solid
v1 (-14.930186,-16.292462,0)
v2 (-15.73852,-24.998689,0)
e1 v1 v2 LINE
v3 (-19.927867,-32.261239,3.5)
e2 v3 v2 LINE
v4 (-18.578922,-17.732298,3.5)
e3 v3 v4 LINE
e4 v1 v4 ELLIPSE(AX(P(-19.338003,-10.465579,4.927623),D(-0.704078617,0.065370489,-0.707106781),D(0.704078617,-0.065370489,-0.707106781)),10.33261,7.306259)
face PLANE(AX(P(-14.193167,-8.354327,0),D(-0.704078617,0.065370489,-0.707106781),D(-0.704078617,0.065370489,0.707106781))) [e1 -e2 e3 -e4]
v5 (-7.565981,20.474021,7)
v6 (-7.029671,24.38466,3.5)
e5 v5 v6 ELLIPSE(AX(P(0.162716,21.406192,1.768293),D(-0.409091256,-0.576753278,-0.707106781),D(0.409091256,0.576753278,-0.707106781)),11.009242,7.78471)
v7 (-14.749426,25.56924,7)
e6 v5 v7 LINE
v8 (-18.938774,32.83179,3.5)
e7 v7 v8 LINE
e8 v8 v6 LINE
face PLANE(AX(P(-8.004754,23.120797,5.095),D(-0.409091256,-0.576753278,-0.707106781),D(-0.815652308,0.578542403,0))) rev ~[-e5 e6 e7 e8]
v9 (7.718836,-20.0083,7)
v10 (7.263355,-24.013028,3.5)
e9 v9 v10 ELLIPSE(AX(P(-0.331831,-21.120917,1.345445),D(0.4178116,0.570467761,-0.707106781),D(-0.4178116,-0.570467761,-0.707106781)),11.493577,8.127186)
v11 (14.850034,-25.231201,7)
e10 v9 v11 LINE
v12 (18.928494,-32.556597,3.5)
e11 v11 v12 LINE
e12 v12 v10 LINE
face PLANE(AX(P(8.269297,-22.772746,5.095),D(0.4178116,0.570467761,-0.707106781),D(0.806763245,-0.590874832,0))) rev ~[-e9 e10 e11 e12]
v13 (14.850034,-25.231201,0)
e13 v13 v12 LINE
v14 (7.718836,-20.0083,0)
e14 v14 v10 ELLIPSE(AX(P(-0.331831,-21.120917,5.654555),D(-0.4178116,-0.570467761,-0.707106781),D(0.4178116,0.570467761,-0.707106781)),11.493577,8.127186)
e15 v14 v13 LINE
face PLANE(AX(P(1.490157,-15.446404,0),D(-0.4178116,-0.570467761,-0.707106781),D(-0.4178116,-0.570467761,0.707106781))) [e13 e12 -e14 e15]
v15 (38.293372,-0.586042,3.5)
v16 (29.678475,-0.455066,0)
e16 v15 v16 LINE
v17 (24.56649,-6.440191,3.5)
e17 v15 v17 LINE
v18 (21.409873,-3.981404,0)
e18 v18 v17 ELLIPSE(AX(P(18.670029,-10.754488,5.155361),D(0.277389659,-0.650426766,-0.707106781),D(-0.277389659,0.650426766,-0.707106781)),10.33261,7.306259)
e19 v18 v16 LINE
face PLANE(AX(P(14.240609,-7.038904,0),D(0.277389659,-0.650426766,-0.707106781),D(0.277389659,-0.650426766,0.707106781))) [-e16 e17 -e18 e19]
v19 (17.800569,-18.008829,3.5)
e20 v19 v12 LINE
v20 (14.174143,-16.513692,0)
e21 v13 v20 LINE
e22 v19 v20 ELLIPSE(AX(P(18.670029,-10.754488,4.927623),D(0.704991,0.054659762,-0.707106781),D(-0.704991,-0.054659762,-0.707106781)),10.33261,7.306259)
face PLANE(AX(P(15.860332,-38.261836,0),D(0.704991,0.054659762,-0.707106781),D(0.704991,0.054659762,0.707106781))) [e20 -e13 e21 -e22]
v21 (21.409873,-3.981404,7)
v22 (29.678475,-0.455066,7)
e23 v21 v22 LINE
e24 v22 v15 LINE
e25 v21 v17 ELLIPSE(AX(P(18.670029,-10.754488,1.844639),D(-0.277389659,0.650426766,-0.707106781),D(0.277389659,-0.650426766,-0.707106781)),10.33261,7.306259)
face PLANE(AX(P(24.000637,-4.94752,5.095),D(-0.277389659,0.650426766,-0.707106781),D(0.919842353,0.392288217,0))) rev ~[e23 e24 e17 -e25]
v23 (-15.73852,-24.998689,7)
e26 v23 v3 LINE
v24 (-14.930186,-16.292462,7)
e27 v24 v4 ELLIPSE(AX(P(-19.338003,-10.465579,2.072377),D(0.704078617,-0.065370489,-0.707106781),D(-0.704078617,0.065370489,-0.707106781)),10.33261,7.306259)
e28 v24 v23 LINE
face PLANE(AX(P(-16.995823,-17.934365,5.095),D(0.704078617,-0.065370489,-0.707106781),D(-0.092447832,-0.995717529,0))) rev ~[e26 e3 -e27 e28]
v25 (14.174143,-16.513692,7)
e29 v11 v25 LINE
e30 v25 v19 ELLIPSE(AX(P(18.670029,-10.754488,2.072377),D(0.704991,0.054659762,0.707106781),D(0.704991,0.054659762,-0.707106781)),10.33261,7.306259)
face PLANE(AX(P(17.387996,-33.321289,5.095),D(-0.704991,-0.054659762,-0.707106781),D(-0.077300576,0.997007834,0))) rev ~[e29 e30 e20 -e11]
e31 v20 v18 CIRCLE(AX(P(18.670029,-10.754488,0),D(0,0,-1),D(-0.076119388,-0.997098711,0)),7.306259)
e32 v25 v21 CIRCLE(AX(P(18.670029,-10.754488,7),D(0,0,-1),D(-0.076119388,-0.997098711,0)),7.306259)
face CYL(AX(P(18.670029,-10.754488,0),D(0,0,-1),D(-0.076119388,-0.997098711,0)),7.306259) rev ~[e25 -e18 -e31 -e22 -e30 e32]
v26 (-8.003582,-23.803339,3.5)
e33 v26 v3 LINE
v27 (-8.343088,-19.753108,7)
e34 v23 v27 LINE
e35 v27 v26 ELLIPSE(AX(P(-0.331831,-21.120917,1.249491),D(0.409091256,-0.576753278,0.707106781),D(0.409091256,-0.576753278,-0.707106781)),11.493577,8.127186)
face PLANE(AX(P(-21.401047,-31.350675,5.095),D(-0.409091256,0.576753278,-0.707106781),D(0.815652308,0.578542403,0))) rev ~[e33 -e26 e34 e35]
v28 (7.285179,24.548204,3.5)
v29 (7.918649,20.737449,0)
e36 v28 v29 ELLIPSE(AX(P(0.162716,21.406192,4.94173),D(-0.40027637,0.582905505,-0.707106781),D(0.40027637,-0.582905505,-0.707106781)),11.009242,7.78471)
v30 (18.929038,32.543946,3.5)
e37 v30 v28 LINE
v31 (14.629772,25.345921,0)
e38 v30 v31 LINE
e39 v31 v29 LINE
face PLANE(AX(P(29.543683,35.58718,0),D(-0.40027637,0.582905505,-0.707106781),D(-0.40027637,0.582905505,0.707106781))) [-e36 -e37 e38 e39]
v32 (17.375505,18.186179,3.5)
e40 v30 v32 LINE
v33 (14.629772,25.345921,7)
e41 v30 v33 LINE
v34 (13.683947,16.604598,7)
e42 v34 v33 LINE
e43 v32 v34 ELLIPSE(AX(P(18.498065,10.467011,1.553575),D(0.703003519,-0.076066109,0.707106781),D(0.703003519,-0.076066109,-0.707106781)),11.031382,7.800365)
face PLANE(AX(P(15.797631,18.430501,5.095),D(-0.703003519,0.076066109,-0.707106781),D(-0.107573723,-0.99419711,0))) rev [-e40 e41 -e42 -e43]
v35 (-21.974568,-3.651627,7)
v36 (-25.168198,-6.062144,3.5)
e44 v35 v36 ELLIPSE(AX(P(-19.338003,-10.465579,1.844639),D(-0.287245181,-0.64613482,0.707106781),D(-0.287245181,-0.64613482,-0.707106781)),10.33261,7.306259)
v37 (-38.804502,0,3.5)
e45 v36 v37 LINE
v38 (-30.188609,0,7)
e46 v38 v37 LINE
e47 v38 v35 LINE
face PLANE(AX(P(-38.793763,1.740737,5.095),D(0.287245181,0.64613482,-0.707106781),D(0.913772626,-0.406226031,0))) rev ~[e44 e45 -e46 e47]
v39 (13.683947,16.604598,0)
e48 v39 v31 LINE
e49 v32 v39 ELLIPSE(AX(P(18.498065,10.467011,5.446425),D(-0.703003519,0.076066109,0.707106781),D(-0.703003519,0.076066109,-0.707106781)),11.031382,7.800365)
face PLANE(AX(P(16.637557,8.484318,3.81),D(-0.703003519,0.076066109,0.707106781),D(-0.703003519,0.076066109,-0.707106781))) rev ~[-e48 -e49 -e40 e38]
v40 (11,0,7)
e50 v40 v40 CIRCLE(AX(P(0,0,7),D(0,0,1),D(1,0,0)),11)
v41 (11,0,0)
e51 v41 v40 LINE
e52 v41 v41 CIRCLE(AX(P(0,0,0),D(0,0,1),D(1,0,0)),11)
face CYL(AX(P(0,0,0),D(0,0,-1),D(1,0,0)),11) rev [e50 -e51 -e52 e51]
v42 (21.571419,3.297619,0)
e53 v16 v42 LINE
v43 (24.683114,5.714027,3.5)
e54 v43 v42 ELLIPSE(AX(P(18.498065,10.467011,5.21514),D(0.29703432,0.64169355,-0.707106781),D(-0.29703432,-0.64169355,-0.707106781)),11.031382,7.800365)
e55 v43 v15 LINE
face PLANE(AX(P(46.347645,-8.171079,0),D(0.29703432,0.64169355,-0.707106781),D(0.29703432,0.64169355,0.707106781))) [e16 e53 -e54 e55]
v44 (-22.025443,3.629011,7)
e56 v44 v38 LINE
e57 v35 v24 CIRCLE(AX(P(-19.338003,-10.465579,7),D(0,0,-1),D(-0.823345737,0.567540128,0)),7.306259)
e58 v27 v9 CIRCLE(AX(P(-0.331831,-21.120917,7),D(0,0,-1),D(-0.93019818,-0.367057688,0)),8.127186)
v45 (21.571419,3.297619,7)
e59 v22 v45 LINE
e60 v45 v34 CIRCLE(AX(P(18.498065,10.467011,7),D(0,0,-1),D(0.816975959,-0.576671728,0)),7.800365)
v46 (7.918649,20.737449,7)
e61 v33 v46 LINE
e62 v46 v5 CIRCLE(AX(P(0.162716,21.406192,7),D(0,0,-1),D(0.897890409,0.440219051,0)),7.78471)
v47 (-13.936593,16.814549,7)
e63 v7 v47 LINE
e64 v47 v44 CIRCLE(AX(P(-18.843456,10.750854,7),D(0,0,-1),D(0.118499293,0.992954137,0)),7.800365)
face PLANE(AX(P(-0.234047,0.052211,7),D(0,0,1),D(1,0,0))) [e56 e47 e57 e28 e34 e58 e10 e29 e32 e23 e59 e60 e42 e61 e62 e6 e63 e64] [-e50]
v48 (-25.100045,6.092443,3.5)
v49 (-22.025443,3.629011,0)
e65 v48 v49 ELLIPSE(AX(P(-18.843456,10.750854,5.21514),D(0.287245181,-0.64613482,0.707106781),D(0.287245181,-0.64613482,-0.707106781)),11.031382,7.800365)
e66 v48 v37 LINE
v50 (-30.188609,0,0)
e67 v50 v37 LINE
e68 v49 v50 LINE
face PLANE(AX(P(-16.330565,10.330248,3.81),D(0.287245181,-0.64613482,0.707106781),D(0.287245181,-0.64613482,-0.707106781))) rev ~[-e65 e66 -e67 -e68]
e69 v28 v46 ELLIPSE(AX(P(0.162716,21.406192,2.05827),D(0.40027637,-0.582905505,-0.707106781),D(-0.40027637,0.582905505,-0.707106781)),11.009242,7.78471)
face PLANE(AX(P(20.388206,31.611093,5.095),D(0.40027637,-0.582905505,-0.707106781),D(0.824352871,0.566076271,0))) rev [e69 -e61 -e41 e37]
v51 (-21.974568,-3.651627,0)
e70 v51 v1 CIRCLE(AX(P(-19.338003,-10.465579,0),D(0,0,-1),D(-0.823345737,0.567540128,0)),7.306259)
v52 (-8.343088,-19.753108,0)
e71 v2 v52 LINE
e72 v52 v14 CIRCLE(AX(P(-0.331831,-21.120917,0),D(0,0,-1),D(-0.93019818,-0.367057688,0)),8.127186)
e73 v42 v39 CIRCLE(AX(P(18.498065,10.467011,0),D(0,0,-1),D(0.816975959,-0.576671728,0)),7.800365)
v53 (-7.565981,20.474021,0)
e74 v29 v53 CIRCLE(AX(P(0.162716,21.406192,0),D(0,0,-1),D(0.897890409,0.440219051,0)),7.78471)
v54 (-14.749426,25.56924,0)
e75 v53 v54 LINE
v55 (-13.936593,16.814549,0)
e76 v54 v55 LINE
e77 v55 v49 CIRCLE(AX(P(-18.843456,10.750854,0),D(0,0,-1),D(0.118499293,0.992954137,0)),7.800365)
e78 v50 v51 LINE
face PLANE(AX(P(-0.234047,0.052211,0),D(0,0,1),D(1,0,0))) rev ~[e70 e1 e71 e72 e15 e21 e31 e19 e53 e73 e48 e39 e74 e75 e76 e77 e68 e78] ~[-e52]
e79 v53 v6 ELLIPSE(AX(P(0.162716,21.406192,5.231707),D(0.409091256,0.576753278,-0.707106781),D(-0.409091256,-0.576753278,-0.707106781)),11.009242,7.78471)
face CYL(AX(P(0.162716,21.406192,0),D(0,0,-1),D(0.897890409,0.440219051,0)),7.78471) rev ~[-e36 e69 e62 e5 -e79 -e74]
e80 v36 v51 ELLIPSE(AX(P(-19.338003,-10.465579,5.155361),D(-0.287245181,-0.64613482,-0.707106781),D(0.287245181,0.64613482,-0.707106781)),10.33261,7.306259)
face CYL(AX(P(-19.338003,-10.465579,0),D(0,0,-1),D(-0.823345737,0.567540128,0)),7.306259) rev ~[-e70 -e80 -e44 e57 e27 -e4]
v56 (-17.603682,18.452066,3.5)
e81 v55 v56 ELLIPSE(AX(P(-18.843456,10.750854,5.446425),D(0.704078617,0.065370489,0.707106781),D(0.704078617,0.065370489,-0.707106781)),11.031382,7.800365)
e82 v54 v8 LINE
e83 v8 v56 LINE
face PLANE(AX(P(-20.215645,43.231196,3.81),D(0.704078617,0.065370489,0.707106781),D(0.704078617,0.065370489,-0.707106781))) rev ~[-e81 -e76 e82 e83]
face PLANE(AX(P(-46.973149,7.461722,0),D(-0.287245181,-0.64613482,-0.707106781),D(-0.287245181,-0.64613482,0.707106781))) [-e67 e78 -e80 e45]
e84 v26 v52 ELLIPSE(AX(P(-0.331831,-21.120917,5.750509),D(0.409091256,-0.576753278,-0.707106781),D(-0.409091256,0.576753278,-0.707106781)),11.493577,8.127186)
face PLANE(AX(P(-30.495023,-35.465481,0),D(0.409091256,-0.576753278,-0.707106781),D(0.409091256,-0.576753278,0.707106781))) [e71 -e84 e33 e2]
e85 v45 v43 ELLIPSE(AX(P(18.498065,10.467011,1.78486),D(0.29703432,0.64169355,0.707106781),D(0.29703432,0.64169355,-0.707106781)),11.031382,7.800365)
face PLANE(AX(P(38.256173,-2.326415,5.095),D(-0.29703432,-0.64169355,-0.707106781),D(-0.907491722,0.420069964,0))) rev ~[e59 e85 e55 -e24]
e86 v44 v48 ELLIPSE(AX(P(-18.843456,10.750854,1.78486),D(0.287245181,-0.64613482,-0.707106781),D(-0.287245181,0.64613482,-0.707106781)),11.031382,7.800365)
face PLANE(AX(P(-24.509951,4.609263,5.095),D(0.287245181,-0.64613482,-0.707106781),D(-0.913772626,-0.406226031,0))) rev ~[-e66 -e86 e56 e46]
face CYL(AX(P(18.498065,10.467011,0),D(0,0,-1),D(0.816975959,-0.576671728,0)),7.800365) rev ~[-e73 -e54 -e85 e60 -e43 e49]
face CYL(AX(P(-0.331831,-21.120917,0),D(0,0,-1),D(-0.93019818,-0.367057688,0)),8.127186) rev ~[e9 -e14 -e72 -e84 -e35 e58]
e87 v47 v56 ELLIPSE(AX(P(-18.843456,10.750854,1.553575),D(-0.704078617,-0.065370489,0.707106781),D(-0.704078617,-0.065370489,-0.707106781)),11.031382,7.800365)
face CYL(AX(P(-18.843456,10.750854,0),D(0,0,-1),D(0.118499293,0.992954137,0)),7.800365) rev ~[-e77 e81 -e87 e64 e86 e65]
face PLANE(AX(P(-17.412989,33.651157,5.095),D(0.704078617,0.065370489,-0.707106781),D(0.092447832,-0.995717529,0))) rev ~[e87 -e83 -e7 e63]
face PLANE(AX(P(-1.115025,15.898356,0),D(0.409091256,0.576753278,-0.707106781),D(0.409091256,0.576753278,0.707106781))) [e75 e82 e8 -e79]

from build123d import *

# Parameters (mm, degrees)
F0_R         = 11
F1_DEPTH     = 7
F2_SIZE      = 3.81
F3_T1_DEPTH  = 34.6394313852
F3_T3_DEPTH  = 34.3439110976
F4_SIZE      = 3.81
F5_T1_DEPTH  = 35.2279158768
F5_T3_DEPTH  = 35.1515641575
F5_T5_DEPTH  = 34.8076073963
F5_T7_DEPTH  = 34.8076073963
F5_T9_DEPTH  = 34.5979192148
F5_T11_DEPTH = 35.1515641575
F5_T13_DEPTH = 35.2279158768
F5_T15_DEPTH = 34.6394313852
F5_T17_DEPTH = 34.8076073963
F6_T1_DEPTH  = 29.7856896268


# Not quite as in the source:
# - a fillet or chamfer that OpenCascade refuses, or shapes differently, is made with other operations: its cross-section is extruded or revolved along the edge and cut away or added


with BuildPart() as f1:
    # F0 (on Top) → F1 (new body)
    with BuildSketch(Plane.XY):
        with BuildLine():
            Line((-19.3098304855, 33.4750442975), (-17.9191186068, 18.4962593726))
            ThreePointArc((-17.9191186068, 18.4962593726), (-12.1734101316, 6.7065768921), (-25.2838117957, 6.35))
            Line((-25.2838117957, 6.35), (-39.5676235915, 0))
            Line((-39.5676235915, 0), (-25.3535799067, -6.3189839441))
            ThreePointArc((-25.3535799067, -6.3189839441), (-12.9763127609, -6.8724869317), (-18.8926645602, -17.7582523592))
            Line((-18.8926645602, -17.7582523592), (-20.2989239466, -32.9044930863))
            Line((-20.2989239466, -32.9044930863), (-7.891724267, -24.1040629982))
            ThreePointArc((-7.891724267, -24.1040629982), (-0.2207247048, -12.9944902326), (7.1436805269, -24.3096295115))
            Line((7.1436805269, -24.3096295115), (19.2464965418, -33.1737534264))
            Line((19.2464965418, -33.1737534264), (19.2872961226, -33.1740312262))
            Line((19.2872961226, -33.1740312262), (18.113880894, -18.0395493303))
            ThreePointArc((18.113880894, -18.0395493303), (12.3636945983, -7.0651033251), (24.7479456966, -6.6998194754))
            Line((24.7479456966, -6.6998194754), (39.056406052, -0.5976429607))
            Line((39.056406052, -0.5976429607), (24.8707754105, 5.9687611329))
            ThreePointArc((24.8707754105, 5.9687611329), (11.7673092468, 6.524596873), (17.6915767021, 18.225572644))
            Line((17.6915767021, 18.225572644), (19.3098304855, 33.1814855899))
            Line((19.3098304855, 33.1814855899), (7.1525325905, 24.8331700857))
            ThreePointArc((7.1525325905, 24.8331700857), (0.2505296838, 13.6219778067), (-6.9026308059, 24.6746142094))
            Line((-6.9026308059, 24.6746142094), (-19.3098304855, 33.4750442975))
        make_face()
        Circle(F0_R, mode=Mode.SUBTRACT)
    extrude(amount=F1_DEPTH)

    # F2
    f2_edges = [f1.edges().sort_by_distance(p)[0] for p in [
        (18.500704, 25.703529, 7),
        (13.231182, 29.007328, 7),
    ]]
    chamfer(f2_edges, length=F2_SIZE)

    # F3: chamfer of 3.81 on 2 edges, made by hand

    # F3_s2 → F3_t1 (cut)
    with BuildSketch(Plane(origin=(1.0999249917, 10.1655145758, 0), x_dir=(0, 0, 1), z_dir=(0.1075737229, 0.9941971103, 0))):
        Polygon((3.81, 15.6283217323), (0, 11.8183217323), (0, 15.6283217323), align=None)
    extrude(amount=F3_T1_DEPTH, mode=Mode.SUBTRACT)

    # F3_s4 → F3_t3 (cut)
    with BuildSketch(Plane(origin=(36.6832724438, 25.190098551, 0), x_dir=(0, 0, 1), z_dir=(-0.8243528709, -0.5660762706, 0))):
        Polygon((0, 12.6124160802), (3.81, 16.4224160802), (0, 16.4224160802), align=None)
    extrude(amount=F3_T3_DEPTH, mode=Mode.SUBTRACT)

    # F4 (call 1 of 6: OpenCascade refuses the feature's edges together)
    f4_edges = [f1.edges().sort_by_distance(p)[0] for p in [
        (31.902176, -3.648731, 7),
        (31.963591, 2.685559, 7),
    ]]
    chamfer(f4_edges, length=F4_SIZE)

    # F4#2 (call 2 of 6)
    f4_2_edges = [f1.edges().sort_by_distance(p)[0] for p in [
        (18.700589, -25.60679, 7),
    ]]
    chamfer(f4_2_edges, length=F4_SIZE)

    # F4#3 (call 3 of 6)
    f4_3_edges = [f1.edges().sort_by_distance(p)[0] for p in [
        (13.195089, -28.741691, 7),
    ]]
    chamfer(f4_3_edges, length=F4_SIZE)

    # F4#4 (call 4 of 6)
    f4_4_edges = [f1.edges().sort_by_distance(p)[0] for p in [
        (-14.095324, -28.504278, 7),
        (-19.595794, -25.331373, 7),
    ]]
    chamfer(f4_4_edges, length=F4_SIZE)

    # F4#5 (call 5 of 6)
    f4_5_edges = [f1.edges().sort_by_distance(p)[0] for p in [
        (-32.460602, -3.159492, 7),
        (-32.425718, 3.175, 7),
    ]]
    chamfer(f4_5_edges, length=F4_SIZE)

    # F4#6 (call 6 of 6)
    f4_6_edges = [f1.edges().sort_by_distance(p)[0] for p in [
        (-18.614475, 25.985652, 7),
        (-13.106231, 29.074829, 7),
    ]]
    chamfer(f4_6_edges, length=F4_SIZE)

    # F5: chamfer of 3.81 on 9 edges, made by hand

    # F5_s2 → F5_t1 (cut)
    with BuildSketch(Plane(origin=(41.2840936669, -19.1100451228, 0), x_dir=(0, 0, 1), z_dir=(-0.9074917218, 0.4200699643, 0))):
        Polygon((0, 12.0540670557), (3.81, 15.8640670557), (0, 15.8640670557), align=None)
    extrude(amount=F5_T1_DEPTH, mode=Mode.SUBTRACT)

    # F5_s4 → F5_t3 (cut)
    with BuildSketch(Plane(origin=(9.5091795604, 4.0554113263, 0), x_dir=(0, 0, 1), z_dir=(0.9198423531, 0.3922882173, 0))):
        Polygon((0, 12.0611052097), (3.81, 15.8711052097), (0, 15.8711052097), align=None)
    extrude(amount=F5_T3_DEPTH, mode=Mode.SUBTRACT)

    # F5_s6 → F5_t5 (cut)
    with BuildSketch(Plane(origin=(-37.0237803275, -26.260977399, 0), x_dir=(0, 0, 1), z_dir=(0.8156523083, 0.5785424029, 0))):
        Polygon((0, 11.2848375041), (3.81, 15.0948375041), (0, 15.0948375041), align=None)
    extrude(amount=F5_T5_DEPTH, mode=Mode.SUBTRACT)

    # F5_s8 → F5_t7 (cut)
    with BuildSketch(Plane(origin=(-0.8903351992, -9.5894337742, 0), x_dir=(0, 0, 1), z_dir=(-0.0924478322, -0.9957175294, 0))):
        Polygon((0, 13.3600453443), (3.81, 17.1700453443), (0, 17.1700453443), align=None)
    extrude(amount=F5_T7_DEPTH, mode=Mode.SUBTRACT)

    # F5_s10 → F5_t9 (cut)
    with BuildSketch(Plane(origin=(8.3331341524, -6.1032022329, 0), x_dir=(0, 0, 1), z_dir=(0.806763245, -0.5908748315, 0))):
        Polygon((0, 11.5810945617), (3.81, 15.3910945617), (0, 15.3910945617), align=None)
    extrude(amount=F5_T9_DEPTH, mode=Mode.SUBTRACT)

    # F5_s12 → F5_t11 (cut)
    with BuildSketch(Plane(origin=(-41.9914373351, 18.6676799506, 0), x_dir=(0, 0, 1), z_dir=(0.9137726258, -0.406226031, 0))):
        Polygon((0, 12.2633986894), (3.81, 16.0733986894), (0, 16.0733986894), align=None)
    extrude(amount=F5_T11_DEPTH, mode=Mode.SUBTRACT)

    # F5_s14 → F5_t13 (cut)
    with BuildSketch(Plane(origin=(-9.8011321421, -4.357183502, 0), x_dir=(0, 0, 1), z_dir=(-0.9137726258, -0.406226031, 0))):
        Polygon((3.81, 16.0733986894), (0, 12.2633986894), (0, 16.0733986894), align=None)
    extrude(amount=F5_T13_DEPTH, mode=Mode.SUBTRACT)

    # F5_s16 → F5_t15 (cut)
    with BuildSketch(Plane(origin=(-4.1522899993, 44.7226055925, 0), x_dir=(0, 0, 1), z_dir=(0.0924478322, -0.9957175294, 0))):
        Polygon((3.81, 16.1324414242), (0, 12.3224414242), (0, 16.1324414242), align=None)
    extrude(amount=F5_T15_DEPTH, mode=Mode.SUBTRACT)

    # F5_s18 → F5_t17 (cut)
    with BuildSketch(Plane(origin=(-8.2440794116, 5.8475277562, 0), x_dir=(0, 0, 1), z_dir=(-0.8156523083, 0.5785424029, 0))):
        Polygon((0, 12.3224414242), (3.81, 16.1324414242), (0, 16.1324414242), align=None)
    extrude(amount=F5_T17_DEPTH, mode=Mode.SUBTRACT)

    # F6: chamfer of 3.81 on 1 edges, made by hand

    # F6_s2 → F6_t1 (cut)
    with BuildSketch(Plane(origin=(3.0435836487, -39.2555512393, 0), x_dir=(0, 0, 1), z_dir=(-0.0773005765, 0.9970078339, 0))):
        Polygon((0, 12.8552135911), (3.81, 16.6652135911), (0, 16.6652135911), align=None)
    extrude(amount=F6_T1_DEPTH, mode=Mode.SUBTRACT)


solid = f1.part
